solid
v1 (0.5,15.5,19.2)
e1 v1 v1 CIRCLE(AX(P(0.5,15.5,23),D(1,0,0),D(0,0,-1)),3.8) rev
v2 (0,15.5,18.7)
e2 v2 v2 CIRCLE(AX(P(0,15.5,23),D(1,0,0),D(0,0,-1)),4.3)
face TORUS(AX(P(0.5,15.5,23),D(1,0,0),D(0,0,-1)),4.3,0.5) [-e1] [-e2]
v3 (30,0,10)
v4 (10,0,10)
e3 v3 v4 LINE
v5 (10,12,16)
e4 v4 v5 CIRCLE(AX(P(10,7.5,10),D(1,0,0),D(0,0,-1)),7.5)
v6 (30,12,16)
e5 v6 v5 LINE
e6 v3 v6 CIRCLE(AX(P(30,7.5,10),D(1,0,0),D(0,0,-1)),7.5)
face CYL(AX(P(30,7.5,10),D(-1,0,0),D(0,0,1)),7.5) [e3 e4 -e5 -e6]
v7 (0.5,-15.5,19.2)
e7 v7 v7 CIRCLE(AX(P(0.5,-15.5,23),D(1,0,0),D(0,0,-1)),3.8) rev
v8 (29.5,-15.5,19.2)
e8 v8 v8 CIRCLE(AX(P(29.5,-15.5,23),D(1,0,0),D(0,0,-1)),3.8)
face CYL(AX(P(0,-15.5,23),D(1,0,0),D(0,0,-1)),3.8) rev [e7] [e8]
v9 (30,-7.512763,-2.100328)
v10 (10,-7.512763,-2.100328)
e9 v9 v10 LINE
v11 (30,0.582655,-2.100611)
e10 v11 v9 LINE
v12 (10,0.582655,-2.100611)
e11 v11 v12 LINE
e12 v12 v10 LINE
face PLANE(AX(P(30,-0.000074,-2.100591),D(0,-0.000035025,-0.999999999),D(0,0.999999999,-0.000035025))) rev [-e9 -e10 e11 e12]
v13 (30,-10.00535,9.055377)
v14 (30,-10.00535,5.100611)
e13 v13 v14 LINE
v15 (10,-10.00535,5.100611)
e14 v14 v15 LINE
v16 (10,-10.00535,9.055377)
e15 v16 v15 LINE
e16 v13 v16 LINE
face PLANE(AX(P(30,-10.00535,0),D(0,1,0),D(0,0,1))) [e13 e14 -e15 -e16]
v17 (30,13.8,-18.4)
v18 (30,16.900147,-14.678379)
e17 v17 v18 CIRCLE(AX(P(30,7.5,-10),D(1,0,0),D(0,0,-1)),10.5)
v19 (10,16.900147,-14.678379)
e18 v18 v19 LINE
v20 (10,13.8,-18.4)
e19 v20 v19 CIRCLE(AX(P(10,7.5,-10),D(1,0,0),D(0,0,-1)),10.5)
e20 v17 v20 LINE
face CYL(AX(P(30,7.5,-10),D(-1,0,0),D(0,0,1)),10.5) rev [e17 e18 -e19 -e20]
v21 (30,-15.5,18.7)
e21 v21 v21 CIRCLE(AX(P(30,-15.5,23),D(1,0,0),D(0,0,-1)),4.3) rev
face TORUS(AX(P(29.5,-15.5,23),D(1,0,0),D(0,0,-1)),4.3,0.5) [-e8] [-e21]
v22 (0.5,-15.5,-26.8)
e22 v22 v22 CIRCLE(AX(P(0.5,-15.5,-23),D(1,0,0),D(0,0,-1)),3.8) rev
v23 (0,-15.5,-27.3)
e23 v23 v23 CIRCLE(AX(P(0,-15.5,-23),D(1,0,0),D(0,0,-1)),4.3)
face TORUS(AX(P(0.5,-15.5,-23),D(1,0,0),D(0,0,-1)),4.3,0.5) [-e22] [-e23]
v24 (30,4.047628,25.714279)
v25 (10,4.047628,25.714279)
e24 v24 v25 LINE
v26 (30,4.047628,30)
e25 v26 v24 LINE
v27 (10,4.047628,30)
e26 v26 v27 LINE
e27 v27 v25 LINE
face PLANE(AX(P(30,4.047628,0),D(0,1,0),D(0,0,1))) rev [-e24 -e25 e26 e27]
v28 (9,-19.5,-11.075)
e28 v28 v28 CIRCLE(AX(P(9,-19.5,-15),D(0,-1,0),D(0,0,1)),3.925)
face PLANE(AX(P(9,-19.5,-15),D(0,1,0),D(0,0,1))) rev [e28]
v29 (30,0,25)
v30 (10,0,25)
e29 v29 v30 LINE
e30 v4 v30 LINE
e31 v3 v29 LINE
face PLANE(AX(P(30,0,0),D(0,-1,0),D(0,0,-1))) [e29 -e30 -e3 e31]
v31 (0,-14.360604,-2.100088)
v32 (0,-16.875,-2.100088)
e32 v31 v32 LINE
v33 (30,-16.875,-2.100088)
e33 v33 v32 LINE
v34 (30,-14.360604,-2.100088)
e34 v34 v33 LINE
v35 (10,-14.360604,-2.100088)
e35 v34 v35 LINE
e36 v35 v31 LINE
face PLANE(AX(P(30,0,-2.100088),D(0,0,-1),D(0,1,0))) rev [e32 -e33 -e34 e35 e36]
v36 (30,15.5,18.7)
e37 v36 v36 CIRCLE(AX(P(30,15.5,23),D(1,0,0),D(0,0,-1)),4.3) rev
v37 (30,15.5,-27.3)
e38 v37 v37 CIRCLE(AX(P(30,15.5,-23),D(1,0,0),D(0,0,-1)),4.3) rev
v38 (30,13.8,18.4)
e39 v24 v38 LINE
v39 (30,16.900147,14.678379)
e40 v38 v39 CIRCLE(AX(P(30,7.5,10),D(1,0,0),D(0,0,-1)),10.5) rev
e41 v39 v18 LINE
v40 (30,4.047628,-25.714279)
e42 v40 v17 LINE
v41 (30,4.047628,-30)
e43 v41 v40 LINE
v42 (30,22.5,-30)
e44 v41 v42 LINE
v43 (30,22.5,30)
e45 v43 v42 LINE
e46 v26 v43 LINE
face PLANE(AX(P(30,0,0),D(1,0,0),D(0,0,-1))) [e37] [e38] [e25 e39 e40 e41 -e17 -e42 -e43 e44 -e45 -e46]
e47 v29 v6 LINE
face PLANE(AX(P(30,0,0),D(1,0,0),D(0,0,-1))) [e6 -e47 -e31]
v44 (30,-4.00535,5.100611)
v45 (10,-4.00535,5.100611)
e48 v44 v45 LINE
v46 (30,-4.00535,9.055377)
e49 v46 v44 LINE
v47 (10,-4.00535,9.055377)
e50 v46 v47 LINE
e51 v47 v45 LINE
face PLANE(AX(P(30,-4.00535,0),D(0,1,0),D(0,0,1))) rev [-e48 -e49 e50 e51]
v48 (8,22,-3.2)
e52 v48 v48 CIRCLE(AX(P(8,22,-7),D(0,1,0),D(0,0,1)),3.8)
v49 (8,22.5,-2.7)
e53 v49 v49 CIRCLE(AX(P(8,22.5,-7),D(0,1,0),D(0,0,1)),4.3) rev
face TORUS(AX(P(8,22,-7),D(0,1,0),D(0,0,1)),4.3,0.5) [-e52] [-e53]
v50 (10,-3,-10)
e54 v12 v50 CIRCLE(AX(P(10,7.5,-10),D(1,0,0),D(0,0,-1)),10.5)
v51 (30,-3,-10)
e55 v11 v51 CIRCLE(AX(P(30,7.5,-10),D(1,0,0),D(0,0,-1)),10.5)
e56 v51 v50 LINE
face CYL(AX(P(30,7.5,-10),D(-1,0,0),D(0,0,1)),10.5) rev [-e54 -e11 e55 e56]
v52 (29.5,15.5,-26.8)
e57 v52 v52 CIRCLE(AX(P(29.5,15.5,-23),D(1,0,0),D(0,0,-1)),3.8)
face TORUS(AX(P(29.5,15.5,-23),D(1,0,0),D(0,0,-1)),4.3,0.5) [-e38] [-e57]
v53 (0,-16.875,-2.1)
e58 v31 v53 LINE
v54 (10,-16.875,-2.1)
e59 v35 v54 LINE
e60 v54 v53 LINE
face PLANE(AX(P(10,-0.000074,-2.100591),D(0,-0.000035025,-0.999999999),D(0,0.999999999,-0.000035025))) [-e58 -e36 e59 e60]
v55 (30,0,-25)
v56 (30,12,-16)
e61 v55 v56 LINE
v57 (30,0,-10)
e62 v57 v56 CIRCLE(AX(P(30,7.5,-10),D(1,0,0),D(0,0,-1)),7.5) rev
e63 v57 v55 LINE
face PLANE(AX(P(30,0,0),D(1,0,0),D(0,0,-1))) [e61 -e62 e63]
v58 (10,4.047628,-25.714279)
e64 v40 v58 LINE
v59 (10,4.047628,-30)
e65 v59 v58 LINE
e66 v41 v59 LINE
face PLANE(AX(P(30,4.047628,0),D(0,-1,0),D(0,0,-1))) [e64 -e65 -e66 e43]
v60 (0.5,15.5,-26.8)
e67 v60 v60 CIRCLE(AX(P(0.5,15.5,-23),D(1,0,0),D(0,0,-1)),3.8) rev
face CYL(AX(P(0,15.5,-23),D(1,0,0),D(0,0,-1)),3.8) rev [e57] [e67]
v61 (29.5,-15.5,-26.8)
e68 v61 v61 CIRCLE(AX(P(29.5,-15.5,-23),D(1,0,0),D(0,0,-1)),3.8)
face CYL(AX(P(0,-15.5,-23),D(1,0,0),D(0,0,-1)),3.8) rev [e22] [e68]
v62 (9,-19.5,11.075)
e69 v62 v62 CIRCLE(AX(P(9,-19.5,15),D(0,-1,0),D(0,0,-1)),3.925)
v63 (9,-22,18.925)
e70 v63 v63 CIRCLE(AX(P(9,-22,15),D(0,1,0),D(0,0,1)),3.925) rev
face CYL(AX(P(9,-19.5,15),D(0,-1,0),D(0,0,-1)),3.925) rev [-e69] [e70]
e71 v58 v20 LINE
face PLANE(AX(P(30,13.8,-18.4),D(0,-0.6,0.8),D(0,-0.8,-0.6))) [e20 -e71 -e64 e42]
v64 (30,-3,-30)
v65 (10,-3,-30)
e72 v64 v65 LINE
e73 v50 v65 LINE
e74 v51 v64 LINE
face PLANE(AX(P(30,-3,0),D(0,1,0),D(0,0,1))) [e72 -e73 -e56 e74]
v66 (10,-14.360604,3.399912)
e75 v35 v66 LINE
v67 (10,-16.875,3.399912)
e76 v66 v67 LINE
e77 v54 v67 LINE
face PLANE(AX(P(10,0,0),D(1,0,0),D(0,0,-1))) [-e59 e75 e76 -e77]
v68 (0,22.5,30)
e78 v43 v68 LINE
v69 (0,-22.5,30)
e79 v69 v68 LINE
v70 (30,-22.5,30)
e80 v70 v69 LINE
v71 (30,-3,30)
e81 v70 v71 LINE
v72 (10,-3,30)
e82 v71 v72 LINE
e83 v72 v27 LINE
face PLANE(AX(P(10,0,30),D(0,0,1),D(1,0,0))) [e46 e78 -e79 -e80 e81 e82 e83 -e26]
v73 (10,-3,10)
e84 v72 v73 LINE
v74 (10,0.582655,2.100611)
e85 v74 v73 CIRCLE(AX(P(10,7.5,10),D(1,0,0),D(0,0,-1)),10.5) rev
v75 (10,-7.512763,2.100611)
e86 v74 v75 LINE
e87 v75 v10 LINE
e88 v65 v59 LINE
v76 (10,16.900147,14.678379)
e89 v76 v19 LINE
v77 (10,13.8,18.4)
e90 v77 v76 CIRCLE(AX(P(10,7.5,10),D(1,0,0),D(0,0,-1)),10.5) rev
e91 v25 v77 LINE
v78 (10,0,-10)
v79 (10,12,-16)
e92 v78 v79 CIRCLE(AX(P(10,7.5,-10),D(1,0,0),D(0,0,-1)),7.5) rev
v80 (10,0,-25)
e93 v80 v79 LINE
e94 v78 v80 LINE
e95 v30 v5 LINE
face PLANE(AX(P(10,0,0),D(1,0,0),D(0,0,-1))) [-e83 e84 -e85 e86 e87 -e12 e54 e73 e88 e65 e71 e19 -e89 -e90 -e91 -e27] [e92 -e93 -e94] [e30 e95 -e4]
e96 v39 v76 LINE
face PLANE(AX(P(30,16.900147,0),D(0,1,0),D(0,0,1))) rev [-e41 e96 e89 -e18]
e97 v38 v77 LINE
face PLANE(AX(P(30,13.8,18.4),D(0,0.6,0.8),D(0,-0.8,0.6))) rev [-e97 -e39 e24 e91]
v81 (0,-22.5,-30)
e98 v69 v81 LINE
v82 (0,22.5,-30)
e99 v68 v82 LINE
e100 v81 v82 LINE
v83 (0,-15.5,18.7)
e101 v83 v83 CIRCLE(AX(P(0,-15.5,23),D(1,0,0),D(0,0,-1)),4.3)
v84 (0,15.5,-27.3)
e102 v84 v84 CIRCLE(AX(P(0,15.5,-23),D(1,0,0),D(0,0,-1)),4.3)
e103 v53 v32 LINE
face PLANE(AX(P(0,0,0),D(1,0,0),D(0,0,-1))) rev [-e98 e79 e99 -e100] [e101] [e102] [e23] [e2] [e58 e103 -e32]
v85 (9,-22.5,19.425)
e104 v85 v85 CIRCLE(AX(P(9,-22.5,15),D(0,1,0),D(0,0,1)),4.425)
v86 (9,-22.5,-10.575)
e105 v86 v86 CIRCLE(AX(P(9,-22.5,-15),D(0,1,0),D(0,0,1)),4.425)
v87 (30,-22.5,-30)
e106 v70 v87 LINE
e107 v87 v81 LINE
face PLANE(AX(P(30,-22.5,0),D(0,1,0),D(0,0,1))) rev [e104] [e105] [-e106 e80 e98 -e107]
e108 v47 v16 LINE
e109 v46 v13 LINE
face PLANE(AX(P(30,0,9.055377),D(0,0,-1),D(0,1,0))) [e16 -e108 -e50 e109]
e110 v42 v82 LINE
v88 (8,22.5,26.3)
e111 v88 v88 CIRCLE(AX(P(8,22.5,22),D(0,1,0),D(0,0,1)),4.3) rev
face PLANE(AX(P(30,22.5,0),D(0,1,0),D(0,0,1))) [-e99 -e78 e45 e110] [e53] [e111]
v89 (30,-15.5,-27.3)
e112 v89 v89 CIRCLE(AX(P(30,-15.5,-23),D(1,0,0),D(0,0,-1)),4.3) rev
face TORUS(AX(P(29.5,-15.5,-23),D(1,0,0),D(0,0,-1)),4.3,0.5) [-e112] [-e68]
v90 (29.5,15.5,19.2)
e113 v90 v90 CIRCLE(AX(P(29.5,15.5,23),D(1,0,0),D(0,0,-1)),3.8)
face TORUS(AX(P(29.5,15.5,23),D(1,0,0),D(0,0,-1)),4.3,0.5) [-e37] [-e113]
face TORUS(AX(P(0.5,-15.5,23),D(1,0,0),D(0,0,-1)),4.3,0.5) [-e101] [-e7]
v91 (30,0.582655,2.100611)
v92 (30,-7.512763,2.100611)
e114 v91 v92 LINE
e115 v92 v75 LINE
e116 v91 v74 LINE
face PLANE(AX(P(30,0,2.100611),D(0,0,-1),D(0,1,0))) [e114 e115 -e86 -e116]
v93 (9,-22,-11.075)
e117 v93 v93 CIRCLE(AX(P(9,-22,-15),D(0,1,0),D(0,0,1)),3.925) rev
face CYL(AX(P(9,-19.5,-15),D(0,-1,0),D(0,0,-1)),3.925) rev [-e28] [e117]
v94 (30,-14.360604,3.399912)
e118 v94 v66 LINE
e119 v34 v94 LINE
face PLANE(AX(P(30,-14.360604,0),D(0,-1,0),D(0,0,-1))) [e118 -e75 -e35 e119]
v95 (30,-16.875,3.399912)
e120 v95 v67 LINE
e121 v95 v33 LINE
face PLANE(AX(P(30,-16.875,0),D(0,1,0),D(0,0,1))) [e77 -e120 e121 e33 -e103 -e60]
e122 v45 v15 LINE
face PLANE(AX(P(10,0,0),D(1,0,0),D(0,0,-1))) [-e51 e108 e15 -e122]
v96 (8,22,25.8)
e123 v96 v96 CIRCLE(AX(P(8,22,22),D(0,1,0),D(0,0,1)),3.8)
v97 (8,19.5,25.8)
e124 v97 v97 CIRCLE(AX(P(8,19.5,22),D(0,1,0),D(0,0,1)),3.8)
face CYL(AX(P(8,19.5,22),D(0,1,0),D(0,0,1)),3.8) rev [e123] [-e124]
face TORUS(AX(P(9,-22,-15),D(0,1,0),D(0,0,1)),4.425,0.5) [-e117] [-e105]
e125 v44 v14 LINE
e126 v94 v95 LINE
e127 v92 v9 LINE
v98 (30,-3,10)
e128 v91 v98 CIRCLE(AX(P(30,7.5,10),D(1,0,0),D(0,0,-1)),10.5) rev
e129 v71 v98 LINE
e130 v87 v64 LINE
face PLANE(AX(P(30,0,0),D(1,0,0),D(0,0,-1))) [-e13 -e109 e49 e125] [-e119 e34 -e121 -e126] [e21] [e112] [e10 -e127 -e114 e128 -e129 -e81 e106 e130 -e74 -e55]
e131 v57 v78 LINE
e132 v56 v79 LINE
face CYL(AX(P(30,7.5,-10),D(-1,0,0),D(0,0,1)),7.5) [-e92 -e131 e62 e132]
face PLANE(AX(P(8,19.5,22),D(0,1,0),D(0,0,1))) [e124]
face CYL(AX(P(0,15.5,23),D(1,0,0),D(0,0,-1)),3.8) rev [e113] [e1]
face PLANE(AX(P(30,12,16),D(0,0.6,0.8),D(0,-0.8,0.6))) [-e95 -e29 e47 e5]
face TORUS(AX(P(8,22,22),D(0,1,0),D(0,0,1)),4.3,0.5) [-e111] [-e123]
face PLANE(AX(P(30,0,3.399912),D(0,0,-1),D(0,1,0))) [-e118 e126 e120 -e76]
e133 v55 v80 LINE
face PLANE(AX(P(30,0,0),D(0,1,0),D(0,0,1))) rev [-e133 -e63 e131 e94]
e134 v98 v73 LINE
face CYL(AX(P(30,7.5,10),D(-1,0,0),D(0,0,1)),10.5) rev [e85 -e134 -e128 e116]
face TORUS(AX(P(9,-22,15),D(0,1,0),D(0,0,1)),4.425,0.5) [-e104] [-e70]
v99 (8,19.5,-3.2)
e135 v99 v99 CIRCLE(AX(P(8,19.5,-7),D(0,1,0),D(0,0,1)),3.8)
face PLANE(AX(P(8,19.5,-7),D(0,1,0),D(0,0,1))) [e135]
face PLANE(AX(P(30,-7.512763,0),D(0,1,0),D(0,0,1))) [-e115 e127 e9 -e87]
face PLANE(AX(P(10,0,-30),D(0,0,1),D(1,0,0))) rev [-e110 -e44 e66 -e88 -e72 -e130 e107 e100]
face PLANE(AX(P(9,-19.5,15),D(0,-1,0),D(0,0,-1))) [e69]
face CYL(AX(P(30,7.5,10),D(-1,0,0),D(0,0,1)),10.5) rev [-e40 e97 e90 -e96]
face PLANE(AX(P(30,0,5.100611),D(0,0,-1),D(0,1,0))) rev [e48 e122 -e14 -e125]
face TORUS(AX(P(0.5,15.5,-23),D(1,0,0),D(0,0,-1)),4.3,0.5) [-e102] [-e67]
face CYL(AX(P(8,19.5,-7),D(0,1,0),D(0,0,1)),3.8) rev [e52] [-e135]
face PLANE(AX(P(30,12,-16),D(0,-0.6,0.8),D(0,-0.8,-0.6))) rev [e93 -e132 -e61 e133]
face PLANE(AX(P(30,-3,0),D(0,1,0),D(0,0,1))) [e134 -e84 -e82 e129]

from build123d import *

# Parameters (mm, degrees)
BOSS_EXTRUDE1_OUTLINE_W   = 3.954765607
BOSS_EXTRUDE1_OUTLINE_H   = 6
BOSS_EXTRUDE1_DEPTH       = 10
BOSS_EXTRUDE2_OUTLINE_W   = 5.5
BOSS_EXTRUDE2_OUTLINE_H   = 2.514395902
BOSS_EXTRUDE2_OUTLINE_W_2 = 3.954765607
BOSS_EXTRUDE2_OUTLINE_H_2 = 6
BOSS_EXTRUDE2_DEPTH       = 30
SKETCH2_R                 = 3.8
CUT_EXTRUDE1_DEPTH        = 3
SKETCH3_R                 = 3.8
CUT_EXTRUDE2_DEPTH        = 49.023431781
FILLET1_R                 = 0.5
FILLET2_R                 = 0.5
FILLET3_R                 = 0.5
SKETCH4_R                 = 3.925
CUT_EXTRUDE3_DEPTH        = 3
FILLET4_R                 = 0.5


# Read off the part's stored shape, not the designer's step: Boss-Extrude1, Boss-Extrude2
with BuildPart() as part:
    # Boss-Extrude1 outline → Boss-Extrude1 (new body)
    # profile 1 of 3: a face of its own
    with BuildSketch(Plane(origin=(0, 0, 0), x_dir=(0, 0, -1), z_dir=(1, 0, 0))):
        with BuildLine():
            Line((25.714279333, 4.047627556), (18.4, 13.8))
            ThreePointArc((18.4, 13.8), (16.720396487, 15.567606278), (14.678379216, 16.900147228))
            Line((14.678379216, 16.900147228), (-14.678379216, 16.900147228))
            ThreePointArc((-14.678379216, 16.900147228), (-16.720396487, 15.567606278), (-18.4, 13.8))
            Line((-18.4, 13.8), (-25.714279333, 4.047627556))
            Line((-25.714279333, 4.047627556), (-30, 4.047627556))
            Line((-30, 4.047627556), (-30, -3))
            Line((-30, -3), (-10, -3))
            ThreePointArc((-10, -3), (-5.663072607, -2.062481937), (-2.100611456, 0.582655088))
            Line((-2.100611456, 0.582655088), (-2.100611456, -7.512763106))
            Line((-2.100611456, -7.512763106), (2.100327913, -7.512763106))
            Line((2.100327913, -7.512763106), (2.100611456, 0.582655088))
            ThreePointArc((2.100611456, 0.582655088), (5.663072607, -2.062481937), (10, -3))
            Line((10, -3), (30, -3))
            Line((30, -3), (30, 4.047627556))
            Line((30, 4.047627556), (25.714279333, 4.047627556))
        make_face()
        with BuildLine():
            Line((-25, 0), (-16, 12))
            ThreePointArc((-16, 12), (-3.291796068, 10.854101966), (-10, 0))
            Line((-10, 0), (-25, 0))
        make_face(mode=Mode.SUBTRACT)
        with BuildLine():
            Line((16, 12), (25, 0))
            Line((25, 0), (10, 0))
            ThreePointArc((10, 0), (3.291796068, 10.854101966), (16, 12))
        make_face(mode=Mode.SUBTRACT)
    # profile 2 of 3: a face of its own
    with BuildSketch(Plane(origin=(0, 0, 0), x_dir=(0, 0, -1), z_dir=(1, 0, 0))):
        Polygon((2.100088067, -14.360604098), (-3.399911933, -14.360604098), (-3.399911933, -16.875), (2.1, -16.875), align=None)
    # profile 3 of 3: a face of its own
    with BuildSketch(Plane(origin=(0, 0, 0), x_dir=(0, 0, -1), z_dir=(1, 0, 0))):
        with Locations((-7.07799426, -7.005350079)):
            Rectangle(BOSS_EXTRUDE1_OUTLINE_W, BOSS_EXTRUDE1_OUTLINE_H)
    extrude(amount=BOSS_EXTRUDE1_DEPTH)

    # Boss-Extrude2 outline → Boss-Extrude2 (add)
    # profile 1 of 4: a face of its own
    with BuildSketch(Plane(origin=(0, 0, 0), x_dir=(0, 0, -1), z_dir=(1, 0, 0))):
        with BuildLine():
            Line((30, 22.5), (-30, 22.5))
            Line((-30, 22.5), (-30, 4.047627556))
            Line((-30, 4.047627556), (-25.714279333, 4.047627556))
            Line((-25.714279333, 4.047627556), (-18.4, 13.8))
            ThreePointArc((-18.4, 13.8), (-16.720396487, 15.567606278), (-14.678379216, 16.900147228))
            Line((-14.678379216, 16.900147228), (14.678379216, 16.900147228))
            ThreePointArc((14.678379216, 16.900147228), (16.720396487, 15.567606278), (18.4, 13.8))
            Line((18.4, 13.8), (25.714279333, 4.047627556))
            Line((25.714279333, 4.047627556), (30, 4.047627556))
            Line((30, 4.047627556), (30, 22.5))
        make_face()
    # profile 2 of 4: a face of its own
    with BuildSketch(Plane(origin=(0, 0, 0), x_dir=(0, 0, -1), z_dir=(1, 0, 0))):
        with BuildLine():
            Line((-10, -3), (-30, -3))
            Line((-30, -3), (-30, -22.5))
            Line((-30, -22.5), (30, -22.5))
            Line((30, -22.5), (30, -3))
            Line((30, -3), (10, -3))
            ThreePointArc((10, -3), (5.663072607, -2.062481937), (2.100611456, 0.582655088))
            Line((2.100611456, 0.582655088), (2.100327913, -7.512763106))
            Line((2.100327913, -7.512763106), (-2.100611456, -7.512763106))
            Line((-2.100611456, -7.512763106), (-2.100611456, 0.582655088))
            ThreePointArc((-2.100611456, 0.582655088), (-5.663072607, -2.062481937), (-10, -3))
        make_face()
        with Locations((-0.649911933, -15.617802049)):
            Rectangle(BOSS_EXTRUDE2_OUTLINE_W, BOSS_EXTRUDE2_OUTLINE_H, mode=Mode.SUBTRACT)
        with Locations((-7.07799426, -7.005350079)):
            Rectangle(BOSS_EXTRUDE2_OUTLINE_W_2, BOSS_EXTRUDE2_OUTLINE_H_2, mode=Mode.SUBTRACT)
    # profile 3 of 4: a face of its own
    with BuildSketch(Plane(origin=(0, 0, 0), x_dir=(0, 0, -1), z_dir=(1, 0, 0))):
        with BuildLine():
            ThreePointArc((-10, 0), (-3.291796068, 10.854101966), (-16, 12))
            Line((-16, 12), (-25, 0))
            Line((-25, 0), (-10, 0))
        make_face()
    # profile 4 of 4: a face of its own
    with BuildSketch(Plane(origin=(0, 0, 0), x_dir=(0, 0, -1), z_dir=(1, 0, 0))):
        with BuildLine():
            Line((10, 0), (25, 0))
            Line((25, 0), (16, 12))
            ThreePointArc((16, 12), (3.291796068, 10.854101966), (10, 0))
        make_face()
    extrude(amount=BOSS_EXTRUDE2_DEPTH)

    # Sketch2 → Cut-Extrude1 (cut)
    with BuildSketch(Plane(origin=(0, 22.5, 0), x_dir=(1, 0, 0), z_dir=(0, 1, 0))):
        with Locations(Location((8, -22, 0), (0, 0, 270))):
            Circle(SKETCH2_R)
        with Locations(Location((8, 7, 0), (0, 0, 270))):
            Circle(SKETCH2_R)
    extrude(amount=-CUT_EXTRUDE1_DEPTH, mode=Mode.SUBTRACT)

    # Sketch3 → Cut-Extrude2 (cut, through all)
    with BuildSketch(Plane(origin=(30, 0, 0), x_dir=(0, 0, -1), z_dir=(1, 0, 0))):
        with Locations((-23, 15.5)):
            Circle(SKETCH3_R)
        with Locations(Location((23, 15.5, 0), (0, 0, 180))):
            Circle(SKETCH3_R)
        with Locations((23, -15.5)):
            Circle(SKETCH3_R)
        with Locations(Location((-23, -15.5, 0), (0, 0, 180))):
            Circle(SKETCH3_R)
    extrude(amount=-CUT_EXTRUDE2_DEPTH, mode=Mode.SUBTRACT)

    # Fillet1
    fillet1_edges = [part.edges().sort_by_distance(p)[0] for p in [
        (30, -15.5, 19.2),
        (30, -15.5, -19.2),
        (30, 15.5, -26.8),
        (30, 15.5, 26.8),
    ]]
    fillet(fillet1_edges, radius=FILLET1_R)

    # Fillet2
    fillet2_edges = [part.edges().sort_by_distance(p)[0] for p in [
        (0, -15.5, 19.2),
        (0, -15.5, -19.2),
        (0, 15.5, -26.8),
        (0, 15.5, 26.8),
    ]]
    fillet(fillet2_edges, radius=FILLET2_R)

    # Fillet3
    fillet3_edges = [part.edges().sort_by_distance(p)[0] for p in [
        (8, 22.5, 18.2),
        (8, 22.5, -10.8),
    ]]
    fillet(fillet3_edges, radius=FILLET3_R)

    # Sketch4 → Cut-Extrude3 (cut)
    with BuildSketch(Plane.XZ.offset(22.5)):
        with Locations(Location((9, 15, 0), (0, 0, 270))):
            Circle(SKETCH4_R)
        with Locations(Location((9, -15, 0), (0, 0, 90))):
            Circle(SKETCH4_R)
    extrude(amount=-CUT_EXTRUDE3_DEPTH, mode=Mode.SUBTRACT)

    # Fillet4
    fillet4_edges = [part.edges().sort_by_distance(p)[0] for p in [
        (9, -22.5, 18.925),
        (9, -22.5, -18.925),
    ]]
    fillet(fillet4_edges, radius=FILLET4_R)


solid = part.part
